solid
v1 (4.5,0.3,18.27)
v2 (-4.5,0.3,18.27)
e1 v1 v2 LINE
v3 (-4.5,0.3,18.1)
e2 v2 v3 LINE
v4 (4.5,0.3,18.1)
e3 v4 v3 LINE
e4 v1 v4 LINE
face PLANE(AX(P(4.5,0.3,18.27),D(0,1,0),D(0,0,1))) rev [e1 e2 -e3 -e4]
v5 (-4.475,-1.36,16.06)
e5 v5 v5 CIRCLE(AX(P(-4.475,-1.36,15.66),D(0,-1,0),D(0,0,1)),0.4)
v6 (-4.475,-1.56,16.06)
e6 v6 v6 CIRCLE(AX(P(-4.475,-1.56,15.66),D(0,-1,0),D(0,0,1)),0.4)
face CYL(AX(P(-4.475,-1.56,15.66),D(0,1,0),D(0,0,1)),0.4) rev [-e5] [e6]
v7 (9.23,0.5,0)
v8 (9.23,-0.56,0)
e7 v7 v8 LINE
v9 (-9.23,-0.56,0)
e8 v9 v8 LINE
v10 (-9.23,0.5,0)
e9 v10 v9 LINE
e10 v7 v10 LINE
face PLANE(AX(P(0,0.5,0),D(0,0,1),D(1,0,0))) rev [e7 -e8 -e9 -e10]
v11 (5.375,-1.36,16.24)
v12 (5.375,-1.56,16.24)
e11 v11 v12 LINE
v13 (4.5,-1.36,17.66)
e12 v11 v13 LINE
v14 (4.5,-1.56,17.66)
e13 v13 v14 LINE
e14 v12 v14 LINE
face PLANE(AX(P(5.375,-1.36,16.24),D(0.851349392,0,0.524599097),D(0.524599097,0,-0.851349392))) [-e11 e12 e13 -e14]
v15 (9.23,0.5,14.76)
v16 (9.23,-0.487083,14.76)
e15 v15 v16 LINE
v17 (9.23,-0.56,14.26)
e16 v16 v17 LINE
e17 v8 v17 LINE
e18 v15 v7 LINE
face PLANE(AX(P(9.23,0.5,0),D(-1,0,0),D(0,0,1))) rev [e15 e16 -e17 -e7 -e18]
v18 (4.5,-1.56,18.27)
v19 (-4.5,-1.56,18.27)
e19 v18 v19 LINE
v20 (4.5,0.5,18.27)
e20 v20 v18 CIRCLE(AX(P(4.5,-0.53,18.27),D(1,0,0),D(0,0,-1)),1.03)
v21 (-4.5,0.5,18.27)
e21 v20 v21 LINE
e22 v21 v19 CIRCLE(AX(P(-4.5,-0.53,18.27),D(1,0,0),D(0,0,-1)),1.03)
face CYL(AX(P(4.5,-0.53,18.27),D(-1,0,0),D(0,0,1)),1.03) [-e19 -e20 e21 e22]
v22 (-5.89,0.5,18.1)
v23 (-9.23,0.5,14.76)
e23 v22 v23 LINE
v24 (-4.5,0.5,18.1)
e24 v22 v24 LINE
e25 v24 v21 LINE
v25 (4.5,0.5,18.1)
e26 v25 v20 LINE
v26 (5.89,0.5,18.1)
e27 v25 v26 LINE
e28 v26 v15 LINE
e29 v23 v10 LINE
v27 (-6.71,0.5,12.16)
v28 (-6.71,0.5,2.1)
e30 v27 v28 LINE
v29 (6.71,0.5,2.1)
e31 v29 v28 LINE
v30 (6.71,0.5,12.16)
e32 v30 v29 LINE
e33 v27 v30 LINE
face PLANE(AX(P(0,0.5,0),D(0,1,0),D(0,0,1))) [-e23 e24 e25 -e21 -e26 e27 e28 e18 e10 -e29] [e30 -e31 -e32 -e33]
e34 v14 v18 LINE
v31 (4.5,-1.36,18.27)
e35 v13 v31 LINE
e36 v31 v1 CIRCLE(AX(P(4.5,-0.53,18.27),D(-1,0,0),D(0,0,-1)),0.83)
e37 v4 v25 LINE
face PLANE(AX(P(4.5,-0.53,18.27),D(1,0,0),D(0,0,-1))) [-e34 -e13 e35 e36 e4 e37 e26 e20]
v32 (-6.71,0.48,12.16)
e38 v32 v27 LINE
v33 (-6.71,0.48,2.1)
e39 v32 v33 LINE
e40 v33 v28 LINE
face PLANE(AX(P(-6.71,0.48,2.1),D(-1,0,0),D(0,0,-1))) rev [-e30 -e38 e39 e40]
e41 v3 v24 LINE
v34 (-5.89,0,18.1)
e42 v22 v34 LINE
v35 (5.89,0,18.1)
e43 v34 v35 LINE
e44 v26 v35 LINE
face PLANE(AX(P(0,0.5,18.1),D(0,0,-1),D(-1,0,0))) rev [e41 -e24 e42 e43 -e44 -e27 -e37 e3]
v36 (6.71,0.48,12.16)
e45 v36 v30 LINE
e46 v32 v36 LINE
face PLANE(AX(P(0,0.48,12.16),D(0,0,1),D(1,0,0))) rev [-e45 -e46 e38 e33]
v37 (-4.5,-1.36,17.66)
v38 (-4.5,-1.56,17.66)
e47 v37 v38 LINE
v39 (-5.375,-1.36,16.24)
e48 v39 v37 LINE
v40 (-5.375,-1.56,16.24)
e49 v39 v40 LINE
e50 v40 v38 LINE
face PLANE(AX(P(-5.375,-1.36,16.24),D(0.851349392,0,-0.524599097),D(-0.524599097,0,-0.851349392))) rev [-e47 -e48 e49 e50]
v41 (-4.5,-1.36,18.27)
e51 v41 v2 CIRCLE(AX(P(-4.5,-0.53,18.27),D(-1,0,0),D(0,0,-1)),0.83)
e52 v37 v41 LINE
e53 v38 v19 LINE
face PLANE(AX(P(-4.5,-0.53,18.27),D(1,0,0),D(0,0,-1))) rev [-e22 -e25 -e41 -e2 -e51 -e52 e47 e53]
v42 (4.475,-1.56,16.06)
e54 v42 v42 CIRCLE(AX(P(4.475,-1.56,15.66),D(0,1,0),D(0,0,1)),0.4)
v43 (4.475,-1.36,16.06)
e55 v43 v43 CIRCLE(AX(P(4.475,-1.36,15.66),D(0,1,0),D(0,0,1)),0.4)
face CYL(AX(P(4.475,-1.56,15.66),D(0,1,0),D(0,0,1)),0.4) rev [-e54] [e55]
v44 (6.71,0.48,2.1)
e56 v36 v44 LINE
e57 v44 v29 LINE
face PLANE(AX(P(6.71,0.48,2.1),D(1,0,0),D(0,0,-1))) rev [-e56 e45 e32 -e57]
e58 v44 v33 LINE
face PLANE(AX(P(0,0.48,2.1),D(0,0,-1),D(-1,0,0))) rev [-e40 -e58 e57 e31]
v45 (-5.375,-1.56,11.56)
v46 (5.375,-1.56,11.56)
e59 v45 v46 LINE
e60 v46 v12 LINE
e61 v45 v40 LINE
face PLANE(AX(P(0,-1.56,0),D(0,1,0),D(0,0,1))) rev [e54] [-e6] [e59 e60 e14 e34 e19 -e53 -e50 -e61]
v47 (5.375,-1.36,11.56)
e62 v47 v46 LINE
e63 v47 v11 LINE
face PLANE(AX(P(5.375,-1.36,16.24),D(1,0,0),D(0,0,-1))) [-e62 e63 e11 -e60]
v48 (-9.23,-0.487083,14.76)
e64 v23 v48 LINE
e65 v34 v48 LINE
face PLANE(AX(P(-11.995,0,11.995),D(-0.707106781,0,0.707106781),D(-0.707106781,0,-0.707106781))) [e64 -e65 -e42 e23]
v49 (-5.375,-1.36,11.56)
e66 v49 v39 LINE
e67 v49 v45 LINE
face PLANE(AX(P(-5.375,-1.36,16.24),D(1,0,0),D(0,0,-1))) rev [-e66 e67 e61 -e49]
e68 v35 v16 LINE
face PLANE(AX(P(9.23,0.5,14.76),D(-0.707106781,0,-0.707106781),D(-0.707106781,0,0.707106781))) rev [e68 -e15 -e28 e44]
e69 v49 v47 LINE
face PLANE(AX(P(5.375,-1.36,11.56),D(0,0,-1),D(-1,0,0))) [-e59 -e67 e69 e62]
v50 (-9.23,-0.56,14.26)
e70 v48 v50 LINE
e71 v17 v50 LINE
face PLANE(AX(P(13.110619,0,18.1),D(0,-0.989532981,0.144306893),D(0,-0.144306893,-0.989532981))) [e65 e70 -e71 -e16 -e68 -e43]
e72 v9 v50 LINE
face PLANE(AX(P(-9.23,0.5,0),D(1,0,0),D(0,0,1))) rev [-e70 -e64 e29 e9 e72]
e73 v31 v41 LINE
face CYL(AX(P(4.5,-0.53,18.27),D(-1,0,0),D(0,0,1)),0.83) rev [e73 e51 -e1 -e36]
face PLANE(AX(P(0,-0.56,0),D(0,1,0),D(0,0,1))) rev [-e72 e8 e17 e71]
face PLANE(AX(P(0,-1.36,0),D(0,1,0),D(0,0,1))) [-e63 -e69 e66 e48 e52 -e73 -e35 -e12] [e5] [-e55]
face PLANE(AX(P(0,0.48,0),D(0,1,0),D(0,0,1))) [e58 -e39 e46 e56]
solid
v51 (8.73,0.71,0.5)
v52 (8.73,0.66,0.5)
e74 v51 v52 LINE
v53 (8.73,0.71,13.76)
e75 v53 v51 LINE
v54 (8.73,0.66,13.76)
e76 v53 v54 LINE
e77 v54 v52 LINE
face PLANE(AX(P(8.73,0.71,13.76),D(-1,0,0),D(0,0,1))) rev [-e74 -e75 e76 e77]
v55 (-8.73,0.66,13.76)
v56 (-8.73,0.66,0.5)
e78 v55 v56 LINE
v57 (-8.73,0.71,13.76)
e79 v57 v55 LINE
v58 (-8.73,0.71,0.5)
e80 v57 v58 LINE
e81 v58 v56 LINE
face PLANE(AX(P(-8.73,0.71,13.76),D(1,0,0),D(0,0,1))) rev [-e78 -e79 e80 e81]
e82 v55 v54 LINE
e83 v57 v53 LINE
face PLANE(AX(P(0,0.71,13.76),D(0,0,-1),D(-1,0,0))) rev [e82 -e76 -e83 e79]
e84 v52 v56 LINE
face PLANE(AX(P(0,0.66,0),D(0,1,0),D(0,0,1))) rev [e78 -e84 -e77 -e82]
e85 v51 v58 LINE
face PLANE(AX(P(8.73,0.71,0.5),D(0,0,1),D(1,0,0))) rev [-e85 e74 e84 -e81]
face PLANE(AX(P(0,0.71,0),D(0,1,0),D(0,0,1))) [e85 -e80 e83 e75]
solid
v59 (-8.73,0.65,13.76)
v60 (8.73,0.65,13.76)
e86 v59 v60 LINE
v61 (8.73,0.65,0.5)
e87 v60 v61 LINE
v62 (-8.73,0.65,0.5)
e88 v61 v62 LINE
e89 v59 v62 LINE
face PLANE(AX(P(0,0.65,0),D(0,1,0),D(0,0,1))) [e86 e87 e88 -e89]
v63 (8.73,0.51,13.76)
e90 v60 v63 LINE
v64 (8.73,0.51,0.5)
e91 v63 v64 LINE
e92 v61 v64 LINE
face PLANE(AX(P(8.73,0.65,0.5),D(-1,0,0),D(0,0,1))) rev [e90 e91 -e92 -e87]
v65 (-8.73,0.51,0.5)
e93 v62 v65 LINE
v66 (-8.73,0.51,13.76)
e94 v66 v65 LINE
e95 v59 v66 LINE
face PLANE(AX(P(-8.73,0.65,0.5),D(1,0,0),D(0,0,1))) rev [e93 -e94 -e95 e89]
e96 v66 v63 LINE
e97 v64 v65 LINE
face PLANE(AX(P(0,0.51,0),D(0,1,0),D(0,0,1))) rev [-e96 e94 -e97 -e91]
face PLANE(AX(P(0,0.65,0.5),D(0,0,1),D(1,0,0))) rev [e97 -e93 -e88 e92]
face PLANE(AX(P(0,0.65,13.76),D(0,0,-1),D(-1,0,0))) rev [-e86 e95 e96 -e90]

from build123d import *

# Parameters (mm, degrees)
EXTRUDE_1_DEPTH      = 0.5
SKETCH_3_W           = 9.23
SKETCH_3_H           = 14.26
EXTRUDE_2_DEPTH      = 0.56
SKETCH_4_W           = 8.73
SKETCH_4_H           = 13.26
EXTRUDE_3_DEPTH      = 0.14
SKETCH_6_W           = 6.71
SKETCH_6_H           = 10.06
CUT_EXTRUDE_1_DEPTH  = 0.02
EXTRUDE_4_REACH      = 22.328
CUT_EXTRUDE_2_DEPTH  = 21.327946281
SKETCH_9_W           = 8.73
SKETCH_9_H           = 13.26
EXTRUDE_2209_DEPTH   = 0.05
MIRROR_START         = 0.5
MIRROR_1_OUTLINE_W   = 8.73
MIRROR_1_OUTLINE_H   = 0.05
MIRROR_1_DEPTH       = 13.26
MIRROR_1_2_OUTLINE_W = 8.73
MIRROR_1_2_OUTLINE_H = 0.14
MIRROR_1_2_DEPTH     = 13.26
MIRROR_1_3_DEPTH     = 0.48
MIRROR_START_2       = -0.56
MIRROR_1_4_OUTLINE_W = 6.71
MIRROR_1_4_OUTLINE_H = 10.06
MIRROR_1_4_DEPTH     = 0.60719
MIRROR_START_3       = 0.48
MIRROR_1_5_DEPTH     = 0.02
MIRROR_START_4       = -9.23
MIRROR_1_6_DEPTH     = 9.23
MIRROR_START_5       = -20
MIRROR_1_7_OUTLINE_W = 8
MIRROR_1_7_OUTLINE_H = 2
MIRROR_1_7_DEPTH     = 3.036508319
EXTRUDE_6_DEPTH      = 4.5
EXTRUDE_7_DEPTH      = 0.2
SKETCH_15_R          = 0.4
CUT_EXTRUDE_3_DEPTH  = 22.493436207


with BuildPart() as part:
    # 草图2 → 凸台-拉伸1 (new body)
    with BuildSketch(Plane(origin=(0, 0, 0), x_dir=(1, 0, 0), z_dir=(0, 1, 0))):
        Polygon((9.23, -14.76), (5.89, -18.1), (0, -18.1), (0, 0), (9.23, 0), align=None)
    extrude(amount=EXTRUDE_1_DEPTH)

    # 草图3 → 凸台-拉伸2 (add)
    with BuildSketch(Plane.XZ):
        with Locations((4.615, 7.13)):
            Rectangle(SKETCH_3_W, SKETCH_3_H)
    extrude(amount=EXTRUDE_2_DEPTH)

    # 草图6 → 切除-拉伸1 (cut)
    with BuildSketch(Plane(origin=(0, 0.5, 0), x_dir=(1, 0, 0), z_dir=(0, 1, 0))):
        with Locations((3.355, -7.13)):
            Rectangle(SKETCH_6_W, SKETCH_6_H)
    extrude(amount=-CUT_EXTRUDE_1_DEPTH, mode=Mode.SUBTRACT)

    # 凸台-拉伸4: up to this face of the body (flat: up to its plane)
    extrude_4_end = Plane(part.part.faces().sort_by_distance((9.23, -0.025444369, 7.250073411))[0])
    # 草图8 → 凸台-拉伸4 (add, up to the picked face)
    with BuildSketch(Plane.ZY, mode=Mode.PRIVATE) as extrude_4_sk1:
        Polygon((14.26, 0), (18.1, 0), (14.26, -0.56), align=None)
    extrude_4_tool1 = split(extrude(extrude_4_sk1.sketch, amount=-EXTRUDE_4_REACH, mode=Mode.PRIVATE), bisect_by=extrude_4_end, keep=Keep.BOTH, mode=Mode.PRIVATE)
    add(extrude_4_tool1.solids().sort_by(Axis((0, -0.186667, 15.54), (1, 0, 0)))[0])

    # 草图12 → 切除-拉伸2 (cut, through all)
    with BuildSketch(Plane(origin=(0, 0, 0), x_dir=(1, 0, 0), z_dir=(0, 1, 0))):
        Polygon((9.23, -14.76), (5.89, -18.1), (9.23, -18.1), align=None)
    extrude(amount=-CUT_EXTRUDE_2_DEPTH, mode=Mode.SUBTRACT)

    # Mirror 1 3 outline → Mirror 1 3 (add)
    with BuildSketch(Plane(origin=(0, 0, 0), x_dir=(1, 0, 0), z_dir=(0, 1, 0))):
        Polygon((-5.89, -18.1), (0, -18.1), (0, 0), (-9.23, 0), (-9.23, -14.76), align=None)
    extrude(amount=MIRROR_1_3_DEPTH)

    # Mirror 1 4 outline → Mirror 1 4 (add)
    with BuildSketch(Plane(origin=(0, 0, 0), x_dir=(1, 0, 0), z_dir=(0, 1, 0)).offset(MIRROR_START_2)):
        with Locations((-3.355, -7.13)):
            Rectangle(MIRROR_1_4_OUTLINE_W, MIRROR_1_4_OUTLINE_H)
    extrude(amount=MIRROR_1_4_DEPTH)

    # Mirror 1 5 outline → Mirror 1 5 (add)
    with BuildSketch(Plane(origin=(0, 0, 0), x_dir=(1, 0, 0), z_dir=(0, 1, 0)).offset(MIRROR_START_3)):
        Polygon((-5.89, -18.1), (0, -18.1), (0, -12.16), (-6.71, -12.16), (-6.71, -2.1), (0, -2.1), (0, 0), (-9.23, 0), (-9.23, -14.76), align=None)
    extrude(amount=MIRROR_1_5_DEPTH)

    # Mirror 1 6 outline → Mirror 1 6 (add)
    with BuildSketch(Plane.YZ.offset(MIRROR_START_4)):
        Polygon((-0.56, 0), (0, 0), (0, 18.1), (-0.56, 14.26), align=None)
    extrude(amount=MIRROR_1_6_DEPTH)

    # Mirror 1 7 outline → Mirror 1 7 (cut)
    with BuildSketch(Plane(origin=(0, 0, 0), x_dir=(0.707106781186552, 0, 0.7071067811865429), z_dir=(0.707106781186543, 0, -0.707106781186552)).offset(MIRROR_START_5)):
        with Locations((6, 1)):
            Rectangle(MIRROR_1_7_OUTLINE_W, MIRROR_1_7_OUTLINE_H)
    extrude(amount=MIRROR_1_7_DEPTH, mode=Mode.SUBTRACT)

    # 草图11 → 凸台-拉伸6 (add, symmetric)
    with BuildSketch(Plane(origin=(0, 0, 0), x_dir=(0, 0, -1), z_dir=(1, 0, 0))):
        with BuildLine():
            Line((-18.27, -1.56), (-18.27, -1.36))
            ThreePointArc((-18.27, -1.36), (-19.1, -0.53), (-18.27, 0.3))
            Line((-18.27, 0.3), (-18.1, 0.3))
            Line((-18.1, 0.3), (-18.1, 0.5))
            Line((-18.1, 0.5), (-18.27, 0.5))
            ThreePointArc((-18.27, 0.5), (-19.3, -0.53), (-18.27, -1.56))
        make_face()
    extrude(amount=EXTRUDE_6_DEPTH, both=True)

    # 草图14 → 凸台-拉伸7 (add)
    with BuildSketch(Plane(origin=(0, -1.56, 0), x_dir=(-1, 0, 0), z_dir=(0, -1, 0))):
        Polygon((-5.375, -16.24), (-5.375, -11.56), (0, -11.56), (0, -18.27), (-4.5, -18.27), (-4.5, -17.66), align=None)
    extrude_7 = extrude(amount=-EXTRUDE_7_DEPTH)

    # 草图15 → 切除-拉伸3 (cut, through all)
    with BuildSketch(Plane(origin=(0, -1.36, 0), x_dir=(1, 0, 0), z_dir=(0, 1, 0))):
        with Locations(Location((4.475, -15.66, 0), (0, 0, 270))):
            Circle(SKETCH_15_R)
    cut_extrude_3 = extrude(amount=-CUT_EXTRUDE_3_DEPTH, mode=Mode.SUBTRACT)

    # 镜向2: 凸台-拉伸7, 切除-拉伸3 across Right Plane
    add(extrude_7.mirror(Plane(origin=(0, 0, 0), x_dir=(0, 0, -1), z_dir=(1, 0, 0))))
    add(cut_extrude_3.mirror(Plane(origin=(0, 0, 0), x_dir=(0, 0, -1), z_dir=(1, 0, 0))), mode=Mode.SUBTRACT)


with BuildPart() as body_2:
    # 草图4 → 凸台-拉伸3 (new body)
    with BuildSketch(Plane(origin=(0, 0.51, 0), x_dir=(1, 0, 0), z_dir=(0, 1, 0))):
        with Locations((4.365, -7.13)):
            Rectangle(SKETCH_4_W, SKETCH_4_H)
    extrude(amount=EXTRUDE_3_DEPTH)

    # Mirror 1 2 outline → Mirror 1 2 (add)
    with BuildSketch(Plane.XY.offset(MIRROR_START)):
        with Locations((-4.365, 0.58)):
            Rectangle(MIRROR_1_2_OUTLINE_W, MIRROR_1_2_OUTLINE_H)
    extrude(amount=MIRROR_1_2_DEPTH)


with BuildPart() as body_3:
    # 草图9 → Extrude 2209 (new body)
    with BuildSketch(Plane(origin=(0, 0.66, 0), x_dir=(1, 0, 0), z_dir=(0, 1, 0))):
        with Locations((4.365, -7.13)):
            Rectangle(SKETCH_9_W, SKETCH_9_H)
    extrude(amount=EXTRUDE_2209_DEPTH)

    # 镜向1: read off the stored shape, not the designer's step
    # 镜向1 outline → 镜向1 (add)
    with BuildSketch(Plane.XY.offset(MIRROR_START)):
        with Locations((-4.365, 0.685)):
            Rectangle(MIRROR_1_OUTLINE_W, MIRROR_1_OUTLINE_H)
    extrude(amount=MIRROR_1_DEPTH)


solid = Compound([part.part, body_2.part, body_3.part])
